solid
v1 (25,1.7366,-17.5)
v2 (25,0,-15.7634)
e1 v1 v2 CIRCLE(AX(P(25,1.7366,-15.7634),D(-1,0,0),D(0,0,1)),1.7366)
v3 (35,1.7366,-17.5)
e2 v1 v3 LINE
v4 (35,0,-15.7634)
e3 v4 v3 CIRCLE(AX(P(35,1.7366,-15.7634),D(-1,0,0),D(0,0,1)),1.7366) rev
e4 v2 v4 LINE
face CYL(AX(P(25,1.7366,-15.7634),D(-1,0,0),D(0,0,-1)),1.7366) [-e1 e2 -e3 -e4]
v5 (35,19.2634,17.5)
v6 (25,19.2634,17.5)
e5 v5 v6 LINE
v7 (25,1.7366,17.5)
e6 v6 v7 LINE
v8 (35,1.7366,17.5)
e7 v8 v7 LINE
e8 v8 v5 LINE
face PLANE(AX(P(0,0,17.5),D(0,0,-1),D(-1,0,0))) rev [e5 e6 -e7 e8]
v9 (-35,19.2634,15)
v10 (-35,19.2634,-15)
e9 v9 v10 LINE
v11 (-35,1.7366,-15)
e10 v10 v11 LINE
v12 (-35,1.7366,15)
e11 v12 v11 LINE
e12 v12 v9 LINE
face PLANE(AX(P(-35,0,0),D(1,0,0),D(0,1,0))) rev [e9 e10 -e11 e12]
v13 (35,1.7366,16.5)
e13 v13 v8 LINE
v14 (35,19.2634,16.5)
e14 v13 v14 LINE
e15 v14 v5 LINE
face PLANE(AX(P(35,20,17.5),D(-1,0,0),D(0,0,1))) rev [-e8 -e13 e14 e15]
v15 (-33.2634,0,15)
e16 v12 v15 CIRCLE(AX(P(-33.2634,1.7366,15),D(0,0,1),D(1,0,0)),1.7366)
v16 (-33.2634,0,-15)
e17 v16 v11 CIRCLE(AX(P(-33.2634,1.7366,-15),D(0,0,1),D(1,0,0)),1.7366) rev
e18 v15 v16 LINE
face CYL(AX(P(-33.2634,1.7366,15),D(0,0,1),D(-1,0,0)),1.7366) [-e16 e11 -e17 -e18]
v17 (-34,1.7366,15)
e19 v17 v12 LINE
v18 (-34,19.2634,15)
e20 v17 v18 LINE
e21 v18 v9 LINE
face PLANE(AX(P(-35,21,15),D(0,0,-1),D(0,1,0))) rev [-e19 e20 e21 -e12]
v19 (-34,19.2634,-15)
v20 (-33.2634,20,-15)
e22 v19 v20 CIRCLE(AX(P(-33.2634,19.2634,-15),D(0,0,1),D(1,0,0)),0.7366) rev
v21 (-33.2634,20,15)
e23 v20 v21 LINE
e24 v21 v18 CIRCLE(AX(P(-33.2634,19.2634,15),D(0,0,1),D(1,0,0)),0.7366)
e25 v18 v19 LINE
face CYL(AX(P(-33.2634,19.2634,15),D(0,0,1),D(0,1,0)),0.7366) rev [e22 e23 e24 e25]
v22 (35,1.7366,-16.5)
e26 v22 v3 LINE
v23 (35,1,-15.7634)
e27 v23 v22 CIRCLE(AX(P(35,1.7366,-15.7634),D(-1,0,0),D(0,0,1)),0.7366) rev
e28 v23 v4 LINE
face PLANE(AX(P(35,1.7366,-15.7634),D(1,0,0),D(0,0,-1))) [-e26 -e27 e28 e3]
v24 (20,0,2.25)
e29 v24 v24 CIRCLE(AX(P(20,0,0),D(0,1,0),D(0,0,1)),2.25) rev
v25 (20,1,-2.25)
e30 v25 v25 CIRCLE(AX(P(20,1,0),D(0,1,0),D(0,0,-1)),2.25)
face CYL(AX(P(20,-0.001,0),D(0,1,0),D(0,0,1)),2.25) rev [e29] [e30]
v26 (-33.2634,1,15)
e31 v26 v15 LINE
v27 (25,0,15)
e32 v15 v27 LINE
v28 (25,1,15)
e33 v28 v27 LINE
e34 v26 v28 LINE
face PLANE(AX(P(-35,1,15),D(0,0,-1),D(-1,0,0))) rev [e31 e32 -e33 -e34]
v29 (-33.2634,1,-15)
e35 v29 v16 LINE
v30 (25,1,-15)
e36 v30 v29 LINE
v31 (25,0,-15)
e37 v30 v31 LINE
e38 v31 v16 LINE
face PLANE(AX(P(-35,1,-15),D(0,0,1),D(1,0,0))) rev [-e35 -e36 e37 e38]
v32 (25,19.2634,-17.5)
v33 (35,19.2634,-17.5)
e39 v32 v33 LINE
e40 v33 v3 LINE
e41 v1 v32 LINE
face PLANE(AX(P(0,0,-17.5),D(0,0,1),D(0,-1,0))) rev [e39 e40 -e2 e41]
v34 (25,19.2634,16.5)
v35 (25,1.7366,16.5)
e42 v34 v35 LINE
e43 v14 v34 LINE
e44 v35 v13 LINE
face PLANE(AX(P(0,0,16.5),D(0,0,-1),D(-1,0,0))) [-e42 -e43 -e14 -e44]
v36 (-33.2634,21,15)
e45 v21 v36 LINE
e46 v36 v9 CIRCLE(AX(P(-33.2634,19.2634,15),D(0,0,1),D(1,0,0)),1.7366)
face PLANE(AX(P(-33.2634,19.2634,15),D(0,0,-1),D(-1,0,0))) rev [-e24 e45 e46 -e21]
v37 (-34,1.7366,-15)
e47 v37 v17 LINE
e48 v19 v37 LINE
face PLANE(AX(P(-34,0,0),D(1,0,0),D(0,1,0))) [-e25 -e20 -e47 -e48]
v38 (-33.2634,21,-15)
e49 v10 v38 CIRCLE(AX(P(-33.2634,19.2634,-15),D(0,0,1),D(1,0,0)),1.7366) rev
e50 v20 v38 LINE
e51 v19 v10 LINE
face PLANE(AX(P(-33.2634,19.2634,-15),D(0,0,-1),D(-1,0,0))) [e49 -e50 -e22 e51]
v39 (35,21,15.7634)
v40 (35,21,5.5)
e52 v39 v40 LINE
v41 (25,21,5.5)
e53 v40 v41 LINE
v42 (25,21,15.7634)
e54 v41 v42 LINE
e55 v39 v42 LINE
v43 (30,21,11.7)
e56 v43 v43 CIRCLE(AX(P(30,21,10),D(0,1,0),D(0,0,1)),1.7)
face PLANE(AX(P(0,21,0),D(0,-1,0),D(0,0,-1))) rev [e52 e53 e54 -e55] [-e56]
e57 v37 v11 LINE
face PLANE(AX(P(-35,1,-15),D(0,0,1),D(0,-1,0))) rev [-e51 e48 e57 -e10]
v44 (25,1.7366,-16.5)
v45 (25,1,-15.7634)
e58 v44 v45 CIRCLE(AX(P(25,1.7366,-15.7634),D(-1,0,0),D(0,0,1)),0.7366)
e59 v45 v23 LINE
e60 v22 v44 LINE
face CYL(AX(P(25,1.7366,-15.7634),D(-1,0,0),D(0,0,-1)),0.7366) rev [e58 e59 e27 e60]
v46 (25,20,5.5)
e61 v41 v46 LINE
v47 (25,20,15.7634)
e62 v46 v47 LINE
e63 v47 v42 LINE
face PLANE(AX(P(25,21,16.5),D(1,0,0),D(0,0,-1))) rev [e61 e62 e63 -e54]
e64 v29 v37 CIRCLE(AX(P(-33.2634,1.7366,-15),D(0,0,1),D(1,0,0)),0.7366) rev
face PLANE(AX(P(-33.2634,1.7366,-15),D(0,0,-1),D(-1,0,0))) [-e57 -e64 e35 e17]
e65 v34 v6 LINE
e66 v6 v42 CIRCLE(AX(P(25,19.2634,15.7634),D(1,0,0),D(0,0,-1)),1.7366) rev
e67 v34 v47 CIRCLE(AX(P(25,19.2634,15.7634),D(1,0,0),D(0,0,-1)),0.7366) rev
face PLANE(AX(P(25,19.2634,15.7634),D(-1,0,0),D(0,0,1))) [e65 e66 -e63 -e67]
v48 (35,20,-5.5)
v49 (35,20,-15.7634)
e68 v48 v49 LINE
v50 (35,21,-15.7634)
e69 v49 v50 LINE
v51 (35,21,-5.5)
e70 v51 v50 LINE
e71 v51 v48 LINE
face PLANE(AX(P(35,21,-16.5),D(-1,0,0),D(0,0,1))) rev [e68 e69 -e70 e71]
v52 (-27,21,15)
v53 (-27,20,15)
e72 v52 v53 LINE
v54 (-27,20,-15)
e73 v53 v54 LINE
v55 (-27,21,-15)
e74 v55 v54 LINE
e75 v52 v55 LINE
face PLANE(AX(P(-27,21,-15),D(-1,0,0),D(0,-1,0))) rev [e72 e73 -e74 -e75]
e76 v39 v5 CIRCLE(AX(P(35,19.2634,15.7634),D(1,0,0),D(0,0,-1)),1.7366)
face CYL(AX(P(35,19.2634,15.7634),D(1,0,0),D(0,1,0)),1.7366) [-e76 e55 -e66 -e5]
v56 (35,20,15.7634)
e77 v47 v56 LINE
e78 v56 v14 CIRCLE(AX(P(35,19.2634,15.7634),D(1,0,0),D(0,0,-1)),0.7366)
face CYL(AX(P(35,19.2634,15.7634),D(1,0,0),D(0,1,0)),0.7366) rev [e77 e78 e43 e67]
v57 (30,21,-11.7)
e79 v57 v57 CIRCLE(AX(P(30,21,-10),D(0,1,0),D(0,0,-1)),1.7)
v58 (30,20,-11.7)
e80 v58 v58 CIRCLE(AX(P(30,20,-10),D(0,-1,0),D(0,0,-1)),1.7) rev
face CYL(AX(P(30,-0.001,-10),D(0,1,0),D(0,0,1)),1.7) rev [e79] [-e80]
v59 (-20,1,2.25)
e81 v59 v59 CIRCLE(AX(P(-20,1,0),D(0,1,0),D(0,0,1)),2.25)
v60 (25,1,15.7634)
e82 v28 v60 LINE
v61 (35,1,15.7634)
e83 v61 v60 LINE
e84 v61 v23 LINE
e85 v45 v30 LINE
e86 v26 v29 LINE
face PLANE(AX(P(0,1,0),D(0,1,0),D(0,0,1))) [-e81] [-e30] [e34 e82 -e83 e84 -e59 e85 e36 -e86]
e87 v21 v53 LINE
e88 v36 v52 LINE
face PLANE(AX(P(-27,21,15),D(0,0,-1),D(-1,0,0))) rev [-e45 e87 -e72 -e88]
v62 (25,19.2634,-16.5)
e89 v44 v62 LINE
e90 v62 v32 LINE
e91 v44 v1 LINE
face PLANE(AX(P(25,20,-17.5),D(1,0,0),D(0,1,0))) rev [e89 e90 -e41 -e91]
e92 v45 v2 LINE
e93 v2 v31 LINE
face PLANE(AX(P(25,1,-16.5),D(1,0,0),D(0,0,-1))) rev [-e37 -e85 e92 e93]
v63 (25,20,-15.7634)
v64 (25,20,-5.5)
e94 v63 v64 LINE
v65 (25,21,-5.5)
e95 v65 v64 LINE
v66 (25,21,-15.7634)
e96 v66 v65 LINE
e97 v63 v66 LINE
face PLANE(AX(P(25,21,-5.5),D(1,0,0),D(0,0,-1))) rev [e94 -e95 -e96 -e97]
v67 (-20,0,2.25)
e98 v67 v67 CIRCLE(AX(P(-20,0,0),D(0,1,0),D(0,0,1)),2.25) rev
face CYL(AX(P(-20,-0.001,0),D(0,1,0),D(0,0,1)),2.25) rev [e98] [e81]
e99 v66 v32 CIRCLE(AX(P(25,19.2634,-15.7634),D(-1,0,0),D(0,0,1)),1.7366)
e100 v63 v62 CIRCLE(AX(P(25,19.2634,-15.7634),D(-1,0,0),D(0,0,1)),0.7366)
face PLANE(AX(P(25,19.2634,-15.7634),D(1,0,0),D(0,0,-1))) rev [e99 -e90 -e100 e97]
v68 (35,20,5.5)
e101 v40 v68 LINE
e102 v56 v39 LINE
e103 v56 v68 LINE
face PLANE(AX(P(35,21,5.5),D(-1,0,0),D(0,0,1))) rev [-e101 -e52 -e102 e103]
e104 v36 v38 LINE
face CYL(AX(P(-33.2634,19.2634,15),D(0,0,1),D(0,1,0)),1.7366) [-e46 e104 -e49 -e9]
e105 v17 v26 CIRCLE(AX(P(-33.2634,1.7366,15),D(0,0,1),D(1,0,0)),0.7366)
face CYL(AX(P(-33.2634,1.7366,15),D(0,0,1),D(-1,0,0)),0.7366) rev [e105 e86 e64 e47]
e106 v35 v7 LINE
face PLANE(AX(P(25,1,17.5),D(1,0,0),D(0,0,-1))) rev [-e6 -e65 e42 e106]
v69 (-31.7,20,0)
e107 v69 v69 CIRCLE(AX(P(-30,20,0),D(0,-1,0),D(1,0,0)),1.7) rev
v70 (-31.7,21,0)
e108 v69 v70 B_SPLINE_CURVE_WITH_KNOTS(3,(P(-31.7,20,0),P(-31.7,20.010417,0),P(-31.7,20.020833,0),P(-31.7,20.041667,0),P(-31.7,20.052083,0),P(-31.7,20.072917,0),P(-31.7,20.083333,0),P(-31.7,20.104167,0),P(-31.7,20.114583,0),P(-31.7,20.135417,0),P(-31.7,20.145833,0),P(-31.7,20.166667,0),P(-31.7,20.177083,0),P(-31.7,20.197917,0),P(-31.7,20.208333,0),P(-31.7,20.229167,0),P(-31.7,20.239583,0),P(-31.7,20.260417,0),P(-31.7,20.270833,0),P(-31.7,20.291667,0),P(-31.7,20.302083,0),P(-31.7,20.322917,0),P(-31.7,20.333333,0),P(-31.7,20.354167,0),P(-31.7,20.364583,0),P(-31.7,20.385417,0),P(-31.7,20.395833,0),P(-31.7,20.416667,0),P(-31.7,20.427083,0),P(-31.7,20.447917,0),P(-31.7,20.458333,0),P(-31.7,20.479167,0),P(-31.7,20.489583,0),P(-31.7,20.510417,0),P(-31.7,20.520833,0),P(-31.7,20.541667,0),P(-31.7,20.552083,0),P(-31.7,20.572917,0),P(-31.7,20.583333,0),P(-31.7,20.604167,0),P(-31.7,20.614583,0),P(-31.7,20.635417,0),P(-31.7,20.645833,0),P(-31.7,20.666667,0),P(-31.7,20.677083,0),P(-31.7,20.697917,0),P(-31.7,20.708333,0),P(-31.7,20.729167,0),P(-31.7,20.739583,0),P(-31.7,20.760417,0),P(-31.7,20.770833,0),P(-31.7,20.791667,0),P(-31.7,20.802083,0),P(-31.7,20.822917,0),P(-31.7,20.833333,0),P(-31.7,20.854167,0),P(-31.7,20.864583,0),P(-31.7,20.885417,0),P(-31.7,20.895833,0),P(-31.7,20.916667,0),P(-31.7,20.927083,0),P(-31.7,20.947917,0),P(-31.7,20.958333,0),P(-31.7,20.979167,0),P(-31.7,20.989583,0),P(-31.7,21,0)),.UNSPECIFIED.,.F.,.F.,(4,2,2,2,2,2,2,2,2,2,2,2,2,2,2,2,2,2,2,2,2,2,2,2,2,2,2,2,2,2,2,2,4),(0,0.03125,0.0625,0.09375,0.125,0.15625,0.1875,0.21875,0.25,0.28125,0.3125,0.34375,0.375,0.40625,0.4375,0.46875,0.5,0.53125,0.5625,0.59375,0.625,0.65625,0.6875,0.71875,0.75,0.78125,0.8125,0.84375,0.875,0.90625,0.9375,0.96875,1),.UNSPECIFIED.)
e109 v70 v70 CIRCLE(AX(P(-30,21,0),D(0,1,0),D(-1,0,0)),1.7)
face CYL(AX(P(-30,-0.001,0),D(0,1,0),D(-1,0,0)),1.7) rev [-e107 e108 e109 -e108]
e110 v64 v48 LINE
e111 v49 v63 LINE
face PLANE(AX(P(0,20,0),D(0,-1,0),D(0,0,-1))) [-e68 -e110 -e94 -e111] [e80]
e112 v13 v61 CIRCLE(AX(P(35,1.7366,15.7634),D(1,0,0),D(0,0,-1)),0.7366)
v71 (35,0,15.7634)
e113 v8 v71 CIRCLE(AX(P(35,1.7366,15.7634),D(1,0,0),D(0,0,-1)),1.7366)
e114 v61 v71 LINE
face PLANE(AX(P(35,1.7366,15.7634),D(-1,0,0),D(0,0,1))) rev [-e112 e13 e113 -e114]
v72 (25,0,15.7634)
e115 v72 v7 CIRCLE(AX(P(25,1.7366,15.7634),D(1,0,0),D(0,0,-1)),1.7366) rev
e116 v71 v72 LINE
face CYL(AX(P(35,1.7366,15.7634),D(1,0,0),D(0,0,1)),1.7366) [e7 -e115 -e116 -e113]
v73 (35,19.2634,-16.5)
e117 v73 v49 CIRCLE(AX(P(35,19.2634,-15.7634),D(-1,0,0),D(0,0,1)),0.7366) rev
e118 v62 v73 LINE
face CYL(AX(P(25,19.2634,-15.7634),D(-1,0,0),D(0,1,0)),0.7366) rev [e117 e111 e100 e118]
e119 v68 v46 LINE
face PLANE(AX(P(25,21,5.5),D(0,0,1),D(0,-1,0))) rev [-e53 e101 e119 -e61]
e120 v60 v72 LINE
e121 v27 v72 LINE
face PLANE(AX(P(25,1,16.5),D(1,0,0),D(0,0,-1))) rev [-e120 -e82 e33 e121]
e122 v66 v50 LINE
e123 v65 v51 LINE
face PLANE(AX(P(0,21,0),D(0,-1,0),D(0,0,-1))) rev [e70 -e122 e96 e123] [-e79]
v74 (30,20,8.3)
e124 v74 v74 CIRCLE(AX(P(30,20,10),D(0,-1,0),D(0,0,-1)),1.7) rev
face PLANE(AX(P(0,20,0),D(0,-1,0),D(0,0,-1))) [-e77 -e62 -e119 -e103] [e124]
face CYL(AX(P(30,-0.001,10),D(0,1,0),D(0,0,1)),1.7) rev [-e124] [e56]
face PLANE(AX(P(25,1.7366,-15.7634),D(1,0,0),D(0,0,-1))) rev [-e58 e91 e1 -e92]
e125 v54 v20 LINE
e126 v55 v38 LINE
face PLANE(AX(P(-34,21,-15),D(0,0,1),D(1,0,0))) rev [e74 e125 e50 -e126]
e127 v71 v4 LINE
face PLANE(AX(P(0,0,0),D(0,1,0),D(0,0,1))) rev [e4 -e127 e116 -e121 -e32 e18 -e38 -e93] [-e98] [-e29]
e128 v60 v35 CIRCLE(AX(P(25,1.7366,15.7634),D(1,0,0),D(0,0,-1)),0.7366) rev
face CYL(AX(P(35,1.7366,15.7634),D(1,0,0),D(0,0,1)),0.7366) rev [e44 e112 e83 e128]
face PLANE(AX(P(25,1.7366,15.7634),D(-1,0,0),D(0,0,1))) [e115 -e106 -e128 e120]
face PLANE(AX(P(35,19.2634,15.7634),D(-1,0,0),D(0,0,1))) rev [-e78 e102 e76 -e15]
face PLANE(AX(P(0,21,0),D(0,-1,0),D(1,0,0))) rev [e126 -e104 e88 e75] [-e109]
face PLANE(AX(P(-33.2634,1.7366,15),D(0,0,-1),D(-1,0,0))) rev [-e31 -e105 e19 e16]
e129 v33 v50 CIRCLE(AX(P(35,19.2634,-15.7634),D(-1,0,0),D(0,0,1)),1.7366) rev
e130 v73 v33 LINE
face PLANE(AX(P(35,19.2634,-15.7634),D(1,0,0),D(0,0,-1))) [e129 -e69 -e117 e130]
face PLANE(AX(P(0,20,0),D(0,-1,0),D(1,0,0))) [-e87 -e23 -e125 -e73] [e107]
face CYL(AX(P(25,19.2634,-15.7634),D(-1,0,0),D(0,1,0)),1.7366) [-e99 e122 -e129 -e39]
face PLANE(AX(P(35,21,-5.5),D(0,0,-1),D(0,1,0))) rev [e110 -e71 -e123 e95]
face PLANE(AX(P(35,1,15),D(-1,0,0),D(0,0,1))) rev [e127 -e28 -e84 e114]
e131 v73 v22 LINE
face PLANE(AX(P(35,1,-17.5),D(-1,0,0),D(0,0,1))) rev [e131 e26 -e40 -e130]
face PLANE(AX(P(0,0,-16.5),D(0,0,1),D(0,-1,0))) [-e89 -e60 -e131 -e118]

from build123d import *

# Parameters (mm, degrees)
T_LE_DE_BASE_PLI_E1_DEPTH               = 1
T_LE_PLI_E_SUR_AR_TE1_STRIP_W           = 5.4732
T_LE_PLI_E_SUR_AR_TE1_STRIP_H           = 1
T_LE_PLI_E_SUR_AR_TE1_STRIP_CUT_DEPTH   = 30
T_LE_PLI_E_SUR_AR_TE1_DEPTH             = 30
T_LE_PLI_E_SUR_AR_TE2_STRIP_W           = 5.4732
T_LE_PLI_E_SUR_AR_TE2_STRIP_H           = 1
T_LE_PLI_E_SUR_AR_TE2_STRIP_CUT_DEPTH   = 30
T_LE_PLI_E_SUR_AR_TE2_DEPTH             = 30
ENL_V_MAT_EXTRU_1_REACH                 = 46.026
ESQUISSE12_R                            = 1.7
ENL_V_MAT_EXTRU_3_REACH                 = 45.557
ESQUISSE27_R                            = 2.25
T_LE_PLI_E_SUR_AR_TE3_STRIP_W           = 5.4732
T_LE_PLI_E_SUR_AR_TE3_STRIP_H           = 1
T_LE_PLI_E_SUR_AR_TE3_STRIP_CUT_DEPTH   = 10
T_LE_PLI_E_SUR_AR_TE3_STRIP_2_W         = 5.4732
T_LE_PLI_E_SUR_AR_TE3_STRIP_2_H         = 1
T_LE_PLI_E_SUR_AR_TE3_STRIP_CUT_2_DEPTH = 10
T_LE_PLI_E_SUR_AR_TE3_DEPTH             = 10
T_LE_PLI_E_SUR_AR_TE3_BEND_DEPTH        = 10
T_LE_PLI_E_SUR_AR_TE4_STRIP_W           = 5.4732
T_LE_PLI_E_SUR_AR_TE4_STRIP_H           = 1
T_LE_PLI_E_SUR_AR_TE4_STRIP_CUT_DEPTH   = 10
T_LE_PLI_E_SUR_AR_TE4_STRIP_2_W         = 5.4732
T_LE_PLI_E_SUR_AR_TE4_STRIP_2_H         = 1
T_LE_PLI_E_SUR_AR_TE4_STRIP_CUT_2_DEPTH = 10
T_LE_PLI_E_SUR_AR_TE4_DEPTH             = 10
T_LE_PLI_E_SUR_AR_TE4_BEND_DEPTH        = 10
ENL_V_MAT_EXTRU_2_REACH                 = 46.41
ESQUISSE26_R                            = 1.7


# Sheet-metal steps are written as plain solids
with BuildPart() as part:
    # Esquisse1 → Tôle de base pliée1 (new body)
    with BuildSketch(Plane(origin=(0, 0, 0), x_dir=(1, 0, 0), z_dir=(0, 1, 0))):
        Polygon((35, -15), (35, -16.5), (25, -16.5), (25, -15), (-35, -15), (-35, 15), (25, 15), (25, 16.5), (35, 16.5), (35, 15), align=None)
    extrude(amount=T_LE_DE_BASE_PLI_E1_DEPTH)

    # Tôle pliée sur arête1 strip (across the edge) → Tôle pliée sur arête1 strip cut (cut)
    with BuildSketch(Plane(origin=(-35, 1, -15), x_dir=(1, 0, 0), z_dir=(0, 0, 1))):
        with Locations((-1, -0.5)):
            Rectangle(T_LE_PLI_E_SUR_AR_TE1_STRIP_W, T_LE_PLI_E_SUR_AR_TE1_STRIP_H)
    extrude(amount=T_LE_PLI_E_SUR_AR_TE1_STRIP_CUT_DEPTH, mode=Mode.SUBTRACT)

    # Tôle pliée sur arête1 section (across the edge) → Tôle pliée sur arête1 (add)
    with BuildSketch(Plane(origin=(-35, 1, -15), x_dir=(1, 0, 0), z_dir=(0, 0, 1))):
        with BuildLine():
            Line((0, 0.7366), (0, 20))
            Line((0, 20), (1, 20))
            Line((1, 20), (1, 0.7366))
            ThreePointArc((1, 0.7366), (1.215745145, 0.215745145), (1.7366, 0))
            Line((1.7366, 0), (1.7366, -1))
            ThreePointArc((1.7366, -1), (0.508638364, -0.491361636), (0, 0.7366))
        make_face()
    extrude(amount=T_LE_PLI_E_SUR_AR_TE1_DEPTH)

    # Tôle pliée sur arête2 strip (across the edge) → Tôle pliée sur arête2 strip cut (cut)
    with BuildSketch(Plane(origin=(-34, 21, -15), x_dir=(0, -1, 0), z_dir=(0, 0, 1))):
        with Locations((-1, -0.5)):
            Rectangle(T_LE_PLI_E_SUR_AR_TE2_STRIP_W, T_LE_PLI_E_SUR_AR_TE2_STRIP_H)
    extrude(amount=T_LE_PLI_E_SUR_AR_TE2_STRIP_CUT_DEPTH, mode=Mode.SUBTRACT)

    # Tôle pliée sur arête2 section (across the edge) → Tôle pliée sur arête2 (add)
    with BuildSketch(Plane(origin=(-34, 21, -15), x_dir=(0, -1, 0), z_dir=(0, 0, 1))):
        with BuildLine():
            Line((0, 0.7366), (0, 7))
            Line((0, 7), (1, 7))
            Line((1, 7), (1, 0.7366))
            ThreePointArc((1, 0.7366), (1.215745145, 0.215745145), (1.7366, 0))
            Line((1.7366, 0), (1.7366, -1))
            ThreePointArc((1.7366, -1), (0.508638364, -0.491361636), (0, 0.7366))
        make_face()
    extrude(amount=T_LE_PLI_E_SUR_AR_TE2_DEPTH)

    # Esquisse12 → Enlèv. mat.-Extru.1 (cut, up to next)
    with BuildSketch(Plane(origin=(0, 21, 0), x_dir=(1, 0, 0), z_dir=(0, 1, 0)), mode=Mode.PRIVATE) as enl_v_mat_extru_1_sk1:
        with Locations(Location((-30, 0, 0), (0, 0, 180))):
            Circle(ESQUISSE12_R)
    enl_v_mat_extru_1_tool1 = extrude(enl_v_mat_extru_1_sk1.sketch, amount=-ENL_V_MAT_EXTRU_1_REACH, mode=Mode.PRIVATE) & part.part
    add(enl_v_mat_extru_1_tool1.solids().sort_by_distance((-30, 21, 0))[0], mode=Mode.SUBTRACT)

    # Esquisse27 → Enlèv. mat.-Extru.3 (cut, up to next)
    with BuildSketch(Plane(origin=(0, 1, 0), x_dir=(1, 0, 0), z_dir=(0, 1, 0)), mode=Mode.PRIVATE) as enl_v_mat_extru_3_sk1:
        with Locations(Location((-20, 0, 0), (0, 0, 270))):
            Circle(ESQUISSE27_R)
    enl_v_mat_extru_3_tool1 = extrude(enl_v_mat_extru_3_sk1.sketch, amount=-ENL_V_MAT_EXTRU_3_REACH, mode=Mode.PRIVATE) & part.part
    # Esquisse27 → Enlèv. mat.-Extru.3 (cut, up to next)
    with BuildSketch(Plane(origin=(0, 1, 0), x_dir=(1, 0, 0), z_dir=(0, 1, 0)), mode=Mode.PRIVATE) as enl_v_mat_extru_3_sk2:
        with Locations(Location((20, 0, 0), (0, 0, 270))):
            Circle(ESQUISSE27_R)
    enl_v_mat_extru_3_tool2 = extrude(enl_v_mat_extru_3_sk2.sketch, amount=-ENL_V_MAT_EXTRU_3_REACH, mode=Mode.PRIVATE) & part.part
    add(enl_v_mat_extru_3_tool1.solids().sort_by_distance((-20, 1, 0))[0], mode=Mode.SUBTRACT)
    add(enl_v_mat_extru_3_tool2.solids().sort_by_distance((20, 1, 0))[0], mode=Mode.SUBTRACT)

    # Tôle pliée sur arête3 strip (across the edge) → Tôle pliée sur arête3 strip cut (cut)
    with BuildSketch(Plane(origin=(25, 1, 16.5), x_dir=(0, 0, -1), z_dir=(1, 0, 0))):
        with Locations((-2, -0.5)):
            Rectangle(T_LE_PLI_E_SUR_AR_TE3_STRIP_W, T_LE_PLI_E_SUR_AR_TE3_STRIP_H)
    extrude(amount=T_LE_PLI_E_SUR_AR_TE3_STRIP_CUT_DEPTH, mode=Mode.SUBTRACT)

    # Tôle pliée sur arête3 strip 2 (across the edge) → Tôle pliée sur arête3 strip cut 2 (cut)
    with BuildSketch(Plane(origin=(35, 1, -16.5), x_dir=(0, 0, 1), z_dir=(-1, 0, 0))):
        with Locations((-2, -0.5)):
            Rectangle(T_LE_PLI_E_SUR_AR_TE3_STRIP_2_W, T_LE_PLI_E_SUR_AR_TE3_STRIP_2_H)
    extrude(amount=T_LE_PLI_E_SUR_AR_TE3_STRIP_CUT_2_DEPTH, mode=Mode.SUBTRACT)

    # Tôle pliée sur arête3 section (across the edge) → Tôle pliée sur arête3 (add)
    with BuildSketch(Plane(origin=(25, 1, 16.5), x_dir=(0, 0, -1), z_dir=(1, 0, 0))):
        with BuildLine():
            Line((-1, 0.7366), (-1, 19))
            Line((-1, 19), (0, 19))
            Line((0, 19), (0, 0.7366))
            ThreePointArc((0, 0.7366), (0.215745145, 0.215745145), (0.7366, 0))
            Line((0.7366, 0), (0.7366, -1))
            ThreePointArc((0.7366, -1), (-0.491361636, -0.491361636), (-1, 0.7366))
        make_face()
    extrude(amount=T_LE_PLI_E_SUR_AR_TE3_DEPTH)

    # Tôle pliée sur arête3 section 2 (across the edge) → Tôle pliée sur arête3 bend (add)
    with BuildSketch(Plane(origin=(35, 1, -16.5), x_dir=(0, 0, 1), z_dir=(-1, 0, 0))):
        with BuildLine():
            Line((-1, 0.7366), (-1, 19))
            Line((-1, 19), (0, 19))
            Line((0, 19), (0, 0.7366))
            ThreePointArc((0, 0.7366), (0.215745145, 0.215745145), (0.7366, 0))
            Line((0.7366, 0), (0.7366, -1))
            ThreePointArc((0.7366, -1), (-0.491361636, -0.491361636), (-1, 0.7366))
        make_face()
    extrude(amount=T_LE_PLI_E_SUR_AR_TE3_BEND_DEPTH)

    # Tôle pliée sur arête4 strip (across the edge) → Tôle pliée sur arête4 strip cut (cut)
    with BuildSketch(Plane(origin=(25, 20, 16.5), x_dir=(0, -1, 0), z_dir=(1, 0, 0))):
        with Locations((-2, -0.5)):
            Rectangle(T_LE_PLI_E_SUR_AR_TE4_STRIP_W, T_LE_PLI_E_SUR_AR_TE4_STRIP_H)
    extrude(amount=T_LE_PLI_E_SUR_AR_TE4_STRIP_CUT_DEPTH, mode=Mode.SUBTRACT)

    # Tôle pliée sur arête4 strip 2 (across the edge) → Tôle pliée sur arête4 strip cut 2 (cut)
    with BuildSketch(Plane(origin=(35, 20, -16.5), x_dir=(0, -1, 0), z_dir=(-1, 0, 0))):
        with Locations((-2, -0.5)):
            Rectangle(T_LE_PLI_E_SUR_AR_TE4_STRIP_2_W, T_LE_PLI_E_SUR_AR_TE4_STRIP_2_H)
    extrude(amount=T_LE_PLI_E_SUR_AR_TE4_STRIP_CUT_2_DEPTH, mode=Mode.SUBTRACT)

    # Tôle pliée sur arête4 section (across the edge) → Tôle pliée sur arête4 (add)
    with BuildSketch(Plane(origin=(25, 20, 16.5), x_dir=(0, -1, 0), z_dir=(1, 0, 0))):
        with BuildLine():
            Line((-1, 0.7366), (-1, 11))
            Line((-1, 11), (0, 11))
            Line((0, 11), (0, 0.7366))
            ThreePointArc((0, 0.7366), (0.215745145, 0.215745145), (0.7366, 0))
            Line((0.7366, 0), (0.7366, -1))
            ThreePointArc((0.7366, -1), (-0.491361636, -0.491361636), (-1, 0.7366))
        make_face()
    extrude(amount=T_LE_PLI_E_SUR_AR_TE4_DEPTH)

    # Tôle pliée sur arête4 section 2 (across the edge) → Tôle pliée sur arête4 bend (add)
    with BuildSketch(Plane(origin=(35, 20, -16.5), x_dir=(0, -1, 0), z_dir=(-1, 0, 0))):
        with BuildLine():
            Line((-1, 0.7366), (-1, 11))
            Line((-1, 11), (0, 11))
            Line((0, 11), (0, 0.7366))
            ThreePointArc((0, 0.7366), (0.215745145, 0.215745145), (0.7366, 0))
            Line((0.7366, 0), (0.7366, -1))
            ThreePointArc((0.7366, -1), (-0.491361636, -0.491361636), (-1, 0.7366))
        make_face()
    extrude(amount=T_LE_PLI_E_SUR_AR_TE4_BEND_DEPTH)

    # Esquisse26 → Enlèv. mat.-Extru.2 (cut, up to next)
    with BuildSketch(Plane(origin=(0, 21, 0), x_dir=(1, 0, 0), z_dir=(0, 1, 0)), mode=Mode.PRIVATE) as enl_v_mat_extru_2_sk1:
        with Locations(Location((30, -10, 0), (0, 0, 270))):
            Circle(ESQUISSE26_R)
    enl_v_mat_extru_2_tool1 = extrude(enl_v_mat_extru_2_sk1.sketch, amount=-ENL_V_MAT_EXTRU_2_REACH, mode=Mode.PRIVATE) & part.part
    # Esquisse26 → Enlèv. mat.-Extru.2 (cut, up to next)
    with BuildSketch(Plane(origin=(0, 21, 0), x_dir=(1, 0, 0), z_dir=(0, 1, 0)), mode=Mode.PRIVATE) as enl_v_mat_extru_2_sk2:
        with Locations(Location((30, 10, 0), (0, 0, 90))):
            Circle(ESQUISSE26_R)
    enl_v_mat_extru_2_tool2 = extrude(enl_v_mat_extru_2_sk2.sketch, amount=-ENL_V_MAT_EXTRU_2_REACH, mode=Mode.PRIVATE) & part.part
    add(enl_v_mat_extru_2_tool1.solids().sort_by_distance((30, 21, 10))[0], mode=Mode.SUBTRACT)
    add(enl_v_mat_extru_2_tool2.solids().sort_by_distance((30, 21, -10))[0], mode=Mode.SUBTRACT)


solid = part.part
